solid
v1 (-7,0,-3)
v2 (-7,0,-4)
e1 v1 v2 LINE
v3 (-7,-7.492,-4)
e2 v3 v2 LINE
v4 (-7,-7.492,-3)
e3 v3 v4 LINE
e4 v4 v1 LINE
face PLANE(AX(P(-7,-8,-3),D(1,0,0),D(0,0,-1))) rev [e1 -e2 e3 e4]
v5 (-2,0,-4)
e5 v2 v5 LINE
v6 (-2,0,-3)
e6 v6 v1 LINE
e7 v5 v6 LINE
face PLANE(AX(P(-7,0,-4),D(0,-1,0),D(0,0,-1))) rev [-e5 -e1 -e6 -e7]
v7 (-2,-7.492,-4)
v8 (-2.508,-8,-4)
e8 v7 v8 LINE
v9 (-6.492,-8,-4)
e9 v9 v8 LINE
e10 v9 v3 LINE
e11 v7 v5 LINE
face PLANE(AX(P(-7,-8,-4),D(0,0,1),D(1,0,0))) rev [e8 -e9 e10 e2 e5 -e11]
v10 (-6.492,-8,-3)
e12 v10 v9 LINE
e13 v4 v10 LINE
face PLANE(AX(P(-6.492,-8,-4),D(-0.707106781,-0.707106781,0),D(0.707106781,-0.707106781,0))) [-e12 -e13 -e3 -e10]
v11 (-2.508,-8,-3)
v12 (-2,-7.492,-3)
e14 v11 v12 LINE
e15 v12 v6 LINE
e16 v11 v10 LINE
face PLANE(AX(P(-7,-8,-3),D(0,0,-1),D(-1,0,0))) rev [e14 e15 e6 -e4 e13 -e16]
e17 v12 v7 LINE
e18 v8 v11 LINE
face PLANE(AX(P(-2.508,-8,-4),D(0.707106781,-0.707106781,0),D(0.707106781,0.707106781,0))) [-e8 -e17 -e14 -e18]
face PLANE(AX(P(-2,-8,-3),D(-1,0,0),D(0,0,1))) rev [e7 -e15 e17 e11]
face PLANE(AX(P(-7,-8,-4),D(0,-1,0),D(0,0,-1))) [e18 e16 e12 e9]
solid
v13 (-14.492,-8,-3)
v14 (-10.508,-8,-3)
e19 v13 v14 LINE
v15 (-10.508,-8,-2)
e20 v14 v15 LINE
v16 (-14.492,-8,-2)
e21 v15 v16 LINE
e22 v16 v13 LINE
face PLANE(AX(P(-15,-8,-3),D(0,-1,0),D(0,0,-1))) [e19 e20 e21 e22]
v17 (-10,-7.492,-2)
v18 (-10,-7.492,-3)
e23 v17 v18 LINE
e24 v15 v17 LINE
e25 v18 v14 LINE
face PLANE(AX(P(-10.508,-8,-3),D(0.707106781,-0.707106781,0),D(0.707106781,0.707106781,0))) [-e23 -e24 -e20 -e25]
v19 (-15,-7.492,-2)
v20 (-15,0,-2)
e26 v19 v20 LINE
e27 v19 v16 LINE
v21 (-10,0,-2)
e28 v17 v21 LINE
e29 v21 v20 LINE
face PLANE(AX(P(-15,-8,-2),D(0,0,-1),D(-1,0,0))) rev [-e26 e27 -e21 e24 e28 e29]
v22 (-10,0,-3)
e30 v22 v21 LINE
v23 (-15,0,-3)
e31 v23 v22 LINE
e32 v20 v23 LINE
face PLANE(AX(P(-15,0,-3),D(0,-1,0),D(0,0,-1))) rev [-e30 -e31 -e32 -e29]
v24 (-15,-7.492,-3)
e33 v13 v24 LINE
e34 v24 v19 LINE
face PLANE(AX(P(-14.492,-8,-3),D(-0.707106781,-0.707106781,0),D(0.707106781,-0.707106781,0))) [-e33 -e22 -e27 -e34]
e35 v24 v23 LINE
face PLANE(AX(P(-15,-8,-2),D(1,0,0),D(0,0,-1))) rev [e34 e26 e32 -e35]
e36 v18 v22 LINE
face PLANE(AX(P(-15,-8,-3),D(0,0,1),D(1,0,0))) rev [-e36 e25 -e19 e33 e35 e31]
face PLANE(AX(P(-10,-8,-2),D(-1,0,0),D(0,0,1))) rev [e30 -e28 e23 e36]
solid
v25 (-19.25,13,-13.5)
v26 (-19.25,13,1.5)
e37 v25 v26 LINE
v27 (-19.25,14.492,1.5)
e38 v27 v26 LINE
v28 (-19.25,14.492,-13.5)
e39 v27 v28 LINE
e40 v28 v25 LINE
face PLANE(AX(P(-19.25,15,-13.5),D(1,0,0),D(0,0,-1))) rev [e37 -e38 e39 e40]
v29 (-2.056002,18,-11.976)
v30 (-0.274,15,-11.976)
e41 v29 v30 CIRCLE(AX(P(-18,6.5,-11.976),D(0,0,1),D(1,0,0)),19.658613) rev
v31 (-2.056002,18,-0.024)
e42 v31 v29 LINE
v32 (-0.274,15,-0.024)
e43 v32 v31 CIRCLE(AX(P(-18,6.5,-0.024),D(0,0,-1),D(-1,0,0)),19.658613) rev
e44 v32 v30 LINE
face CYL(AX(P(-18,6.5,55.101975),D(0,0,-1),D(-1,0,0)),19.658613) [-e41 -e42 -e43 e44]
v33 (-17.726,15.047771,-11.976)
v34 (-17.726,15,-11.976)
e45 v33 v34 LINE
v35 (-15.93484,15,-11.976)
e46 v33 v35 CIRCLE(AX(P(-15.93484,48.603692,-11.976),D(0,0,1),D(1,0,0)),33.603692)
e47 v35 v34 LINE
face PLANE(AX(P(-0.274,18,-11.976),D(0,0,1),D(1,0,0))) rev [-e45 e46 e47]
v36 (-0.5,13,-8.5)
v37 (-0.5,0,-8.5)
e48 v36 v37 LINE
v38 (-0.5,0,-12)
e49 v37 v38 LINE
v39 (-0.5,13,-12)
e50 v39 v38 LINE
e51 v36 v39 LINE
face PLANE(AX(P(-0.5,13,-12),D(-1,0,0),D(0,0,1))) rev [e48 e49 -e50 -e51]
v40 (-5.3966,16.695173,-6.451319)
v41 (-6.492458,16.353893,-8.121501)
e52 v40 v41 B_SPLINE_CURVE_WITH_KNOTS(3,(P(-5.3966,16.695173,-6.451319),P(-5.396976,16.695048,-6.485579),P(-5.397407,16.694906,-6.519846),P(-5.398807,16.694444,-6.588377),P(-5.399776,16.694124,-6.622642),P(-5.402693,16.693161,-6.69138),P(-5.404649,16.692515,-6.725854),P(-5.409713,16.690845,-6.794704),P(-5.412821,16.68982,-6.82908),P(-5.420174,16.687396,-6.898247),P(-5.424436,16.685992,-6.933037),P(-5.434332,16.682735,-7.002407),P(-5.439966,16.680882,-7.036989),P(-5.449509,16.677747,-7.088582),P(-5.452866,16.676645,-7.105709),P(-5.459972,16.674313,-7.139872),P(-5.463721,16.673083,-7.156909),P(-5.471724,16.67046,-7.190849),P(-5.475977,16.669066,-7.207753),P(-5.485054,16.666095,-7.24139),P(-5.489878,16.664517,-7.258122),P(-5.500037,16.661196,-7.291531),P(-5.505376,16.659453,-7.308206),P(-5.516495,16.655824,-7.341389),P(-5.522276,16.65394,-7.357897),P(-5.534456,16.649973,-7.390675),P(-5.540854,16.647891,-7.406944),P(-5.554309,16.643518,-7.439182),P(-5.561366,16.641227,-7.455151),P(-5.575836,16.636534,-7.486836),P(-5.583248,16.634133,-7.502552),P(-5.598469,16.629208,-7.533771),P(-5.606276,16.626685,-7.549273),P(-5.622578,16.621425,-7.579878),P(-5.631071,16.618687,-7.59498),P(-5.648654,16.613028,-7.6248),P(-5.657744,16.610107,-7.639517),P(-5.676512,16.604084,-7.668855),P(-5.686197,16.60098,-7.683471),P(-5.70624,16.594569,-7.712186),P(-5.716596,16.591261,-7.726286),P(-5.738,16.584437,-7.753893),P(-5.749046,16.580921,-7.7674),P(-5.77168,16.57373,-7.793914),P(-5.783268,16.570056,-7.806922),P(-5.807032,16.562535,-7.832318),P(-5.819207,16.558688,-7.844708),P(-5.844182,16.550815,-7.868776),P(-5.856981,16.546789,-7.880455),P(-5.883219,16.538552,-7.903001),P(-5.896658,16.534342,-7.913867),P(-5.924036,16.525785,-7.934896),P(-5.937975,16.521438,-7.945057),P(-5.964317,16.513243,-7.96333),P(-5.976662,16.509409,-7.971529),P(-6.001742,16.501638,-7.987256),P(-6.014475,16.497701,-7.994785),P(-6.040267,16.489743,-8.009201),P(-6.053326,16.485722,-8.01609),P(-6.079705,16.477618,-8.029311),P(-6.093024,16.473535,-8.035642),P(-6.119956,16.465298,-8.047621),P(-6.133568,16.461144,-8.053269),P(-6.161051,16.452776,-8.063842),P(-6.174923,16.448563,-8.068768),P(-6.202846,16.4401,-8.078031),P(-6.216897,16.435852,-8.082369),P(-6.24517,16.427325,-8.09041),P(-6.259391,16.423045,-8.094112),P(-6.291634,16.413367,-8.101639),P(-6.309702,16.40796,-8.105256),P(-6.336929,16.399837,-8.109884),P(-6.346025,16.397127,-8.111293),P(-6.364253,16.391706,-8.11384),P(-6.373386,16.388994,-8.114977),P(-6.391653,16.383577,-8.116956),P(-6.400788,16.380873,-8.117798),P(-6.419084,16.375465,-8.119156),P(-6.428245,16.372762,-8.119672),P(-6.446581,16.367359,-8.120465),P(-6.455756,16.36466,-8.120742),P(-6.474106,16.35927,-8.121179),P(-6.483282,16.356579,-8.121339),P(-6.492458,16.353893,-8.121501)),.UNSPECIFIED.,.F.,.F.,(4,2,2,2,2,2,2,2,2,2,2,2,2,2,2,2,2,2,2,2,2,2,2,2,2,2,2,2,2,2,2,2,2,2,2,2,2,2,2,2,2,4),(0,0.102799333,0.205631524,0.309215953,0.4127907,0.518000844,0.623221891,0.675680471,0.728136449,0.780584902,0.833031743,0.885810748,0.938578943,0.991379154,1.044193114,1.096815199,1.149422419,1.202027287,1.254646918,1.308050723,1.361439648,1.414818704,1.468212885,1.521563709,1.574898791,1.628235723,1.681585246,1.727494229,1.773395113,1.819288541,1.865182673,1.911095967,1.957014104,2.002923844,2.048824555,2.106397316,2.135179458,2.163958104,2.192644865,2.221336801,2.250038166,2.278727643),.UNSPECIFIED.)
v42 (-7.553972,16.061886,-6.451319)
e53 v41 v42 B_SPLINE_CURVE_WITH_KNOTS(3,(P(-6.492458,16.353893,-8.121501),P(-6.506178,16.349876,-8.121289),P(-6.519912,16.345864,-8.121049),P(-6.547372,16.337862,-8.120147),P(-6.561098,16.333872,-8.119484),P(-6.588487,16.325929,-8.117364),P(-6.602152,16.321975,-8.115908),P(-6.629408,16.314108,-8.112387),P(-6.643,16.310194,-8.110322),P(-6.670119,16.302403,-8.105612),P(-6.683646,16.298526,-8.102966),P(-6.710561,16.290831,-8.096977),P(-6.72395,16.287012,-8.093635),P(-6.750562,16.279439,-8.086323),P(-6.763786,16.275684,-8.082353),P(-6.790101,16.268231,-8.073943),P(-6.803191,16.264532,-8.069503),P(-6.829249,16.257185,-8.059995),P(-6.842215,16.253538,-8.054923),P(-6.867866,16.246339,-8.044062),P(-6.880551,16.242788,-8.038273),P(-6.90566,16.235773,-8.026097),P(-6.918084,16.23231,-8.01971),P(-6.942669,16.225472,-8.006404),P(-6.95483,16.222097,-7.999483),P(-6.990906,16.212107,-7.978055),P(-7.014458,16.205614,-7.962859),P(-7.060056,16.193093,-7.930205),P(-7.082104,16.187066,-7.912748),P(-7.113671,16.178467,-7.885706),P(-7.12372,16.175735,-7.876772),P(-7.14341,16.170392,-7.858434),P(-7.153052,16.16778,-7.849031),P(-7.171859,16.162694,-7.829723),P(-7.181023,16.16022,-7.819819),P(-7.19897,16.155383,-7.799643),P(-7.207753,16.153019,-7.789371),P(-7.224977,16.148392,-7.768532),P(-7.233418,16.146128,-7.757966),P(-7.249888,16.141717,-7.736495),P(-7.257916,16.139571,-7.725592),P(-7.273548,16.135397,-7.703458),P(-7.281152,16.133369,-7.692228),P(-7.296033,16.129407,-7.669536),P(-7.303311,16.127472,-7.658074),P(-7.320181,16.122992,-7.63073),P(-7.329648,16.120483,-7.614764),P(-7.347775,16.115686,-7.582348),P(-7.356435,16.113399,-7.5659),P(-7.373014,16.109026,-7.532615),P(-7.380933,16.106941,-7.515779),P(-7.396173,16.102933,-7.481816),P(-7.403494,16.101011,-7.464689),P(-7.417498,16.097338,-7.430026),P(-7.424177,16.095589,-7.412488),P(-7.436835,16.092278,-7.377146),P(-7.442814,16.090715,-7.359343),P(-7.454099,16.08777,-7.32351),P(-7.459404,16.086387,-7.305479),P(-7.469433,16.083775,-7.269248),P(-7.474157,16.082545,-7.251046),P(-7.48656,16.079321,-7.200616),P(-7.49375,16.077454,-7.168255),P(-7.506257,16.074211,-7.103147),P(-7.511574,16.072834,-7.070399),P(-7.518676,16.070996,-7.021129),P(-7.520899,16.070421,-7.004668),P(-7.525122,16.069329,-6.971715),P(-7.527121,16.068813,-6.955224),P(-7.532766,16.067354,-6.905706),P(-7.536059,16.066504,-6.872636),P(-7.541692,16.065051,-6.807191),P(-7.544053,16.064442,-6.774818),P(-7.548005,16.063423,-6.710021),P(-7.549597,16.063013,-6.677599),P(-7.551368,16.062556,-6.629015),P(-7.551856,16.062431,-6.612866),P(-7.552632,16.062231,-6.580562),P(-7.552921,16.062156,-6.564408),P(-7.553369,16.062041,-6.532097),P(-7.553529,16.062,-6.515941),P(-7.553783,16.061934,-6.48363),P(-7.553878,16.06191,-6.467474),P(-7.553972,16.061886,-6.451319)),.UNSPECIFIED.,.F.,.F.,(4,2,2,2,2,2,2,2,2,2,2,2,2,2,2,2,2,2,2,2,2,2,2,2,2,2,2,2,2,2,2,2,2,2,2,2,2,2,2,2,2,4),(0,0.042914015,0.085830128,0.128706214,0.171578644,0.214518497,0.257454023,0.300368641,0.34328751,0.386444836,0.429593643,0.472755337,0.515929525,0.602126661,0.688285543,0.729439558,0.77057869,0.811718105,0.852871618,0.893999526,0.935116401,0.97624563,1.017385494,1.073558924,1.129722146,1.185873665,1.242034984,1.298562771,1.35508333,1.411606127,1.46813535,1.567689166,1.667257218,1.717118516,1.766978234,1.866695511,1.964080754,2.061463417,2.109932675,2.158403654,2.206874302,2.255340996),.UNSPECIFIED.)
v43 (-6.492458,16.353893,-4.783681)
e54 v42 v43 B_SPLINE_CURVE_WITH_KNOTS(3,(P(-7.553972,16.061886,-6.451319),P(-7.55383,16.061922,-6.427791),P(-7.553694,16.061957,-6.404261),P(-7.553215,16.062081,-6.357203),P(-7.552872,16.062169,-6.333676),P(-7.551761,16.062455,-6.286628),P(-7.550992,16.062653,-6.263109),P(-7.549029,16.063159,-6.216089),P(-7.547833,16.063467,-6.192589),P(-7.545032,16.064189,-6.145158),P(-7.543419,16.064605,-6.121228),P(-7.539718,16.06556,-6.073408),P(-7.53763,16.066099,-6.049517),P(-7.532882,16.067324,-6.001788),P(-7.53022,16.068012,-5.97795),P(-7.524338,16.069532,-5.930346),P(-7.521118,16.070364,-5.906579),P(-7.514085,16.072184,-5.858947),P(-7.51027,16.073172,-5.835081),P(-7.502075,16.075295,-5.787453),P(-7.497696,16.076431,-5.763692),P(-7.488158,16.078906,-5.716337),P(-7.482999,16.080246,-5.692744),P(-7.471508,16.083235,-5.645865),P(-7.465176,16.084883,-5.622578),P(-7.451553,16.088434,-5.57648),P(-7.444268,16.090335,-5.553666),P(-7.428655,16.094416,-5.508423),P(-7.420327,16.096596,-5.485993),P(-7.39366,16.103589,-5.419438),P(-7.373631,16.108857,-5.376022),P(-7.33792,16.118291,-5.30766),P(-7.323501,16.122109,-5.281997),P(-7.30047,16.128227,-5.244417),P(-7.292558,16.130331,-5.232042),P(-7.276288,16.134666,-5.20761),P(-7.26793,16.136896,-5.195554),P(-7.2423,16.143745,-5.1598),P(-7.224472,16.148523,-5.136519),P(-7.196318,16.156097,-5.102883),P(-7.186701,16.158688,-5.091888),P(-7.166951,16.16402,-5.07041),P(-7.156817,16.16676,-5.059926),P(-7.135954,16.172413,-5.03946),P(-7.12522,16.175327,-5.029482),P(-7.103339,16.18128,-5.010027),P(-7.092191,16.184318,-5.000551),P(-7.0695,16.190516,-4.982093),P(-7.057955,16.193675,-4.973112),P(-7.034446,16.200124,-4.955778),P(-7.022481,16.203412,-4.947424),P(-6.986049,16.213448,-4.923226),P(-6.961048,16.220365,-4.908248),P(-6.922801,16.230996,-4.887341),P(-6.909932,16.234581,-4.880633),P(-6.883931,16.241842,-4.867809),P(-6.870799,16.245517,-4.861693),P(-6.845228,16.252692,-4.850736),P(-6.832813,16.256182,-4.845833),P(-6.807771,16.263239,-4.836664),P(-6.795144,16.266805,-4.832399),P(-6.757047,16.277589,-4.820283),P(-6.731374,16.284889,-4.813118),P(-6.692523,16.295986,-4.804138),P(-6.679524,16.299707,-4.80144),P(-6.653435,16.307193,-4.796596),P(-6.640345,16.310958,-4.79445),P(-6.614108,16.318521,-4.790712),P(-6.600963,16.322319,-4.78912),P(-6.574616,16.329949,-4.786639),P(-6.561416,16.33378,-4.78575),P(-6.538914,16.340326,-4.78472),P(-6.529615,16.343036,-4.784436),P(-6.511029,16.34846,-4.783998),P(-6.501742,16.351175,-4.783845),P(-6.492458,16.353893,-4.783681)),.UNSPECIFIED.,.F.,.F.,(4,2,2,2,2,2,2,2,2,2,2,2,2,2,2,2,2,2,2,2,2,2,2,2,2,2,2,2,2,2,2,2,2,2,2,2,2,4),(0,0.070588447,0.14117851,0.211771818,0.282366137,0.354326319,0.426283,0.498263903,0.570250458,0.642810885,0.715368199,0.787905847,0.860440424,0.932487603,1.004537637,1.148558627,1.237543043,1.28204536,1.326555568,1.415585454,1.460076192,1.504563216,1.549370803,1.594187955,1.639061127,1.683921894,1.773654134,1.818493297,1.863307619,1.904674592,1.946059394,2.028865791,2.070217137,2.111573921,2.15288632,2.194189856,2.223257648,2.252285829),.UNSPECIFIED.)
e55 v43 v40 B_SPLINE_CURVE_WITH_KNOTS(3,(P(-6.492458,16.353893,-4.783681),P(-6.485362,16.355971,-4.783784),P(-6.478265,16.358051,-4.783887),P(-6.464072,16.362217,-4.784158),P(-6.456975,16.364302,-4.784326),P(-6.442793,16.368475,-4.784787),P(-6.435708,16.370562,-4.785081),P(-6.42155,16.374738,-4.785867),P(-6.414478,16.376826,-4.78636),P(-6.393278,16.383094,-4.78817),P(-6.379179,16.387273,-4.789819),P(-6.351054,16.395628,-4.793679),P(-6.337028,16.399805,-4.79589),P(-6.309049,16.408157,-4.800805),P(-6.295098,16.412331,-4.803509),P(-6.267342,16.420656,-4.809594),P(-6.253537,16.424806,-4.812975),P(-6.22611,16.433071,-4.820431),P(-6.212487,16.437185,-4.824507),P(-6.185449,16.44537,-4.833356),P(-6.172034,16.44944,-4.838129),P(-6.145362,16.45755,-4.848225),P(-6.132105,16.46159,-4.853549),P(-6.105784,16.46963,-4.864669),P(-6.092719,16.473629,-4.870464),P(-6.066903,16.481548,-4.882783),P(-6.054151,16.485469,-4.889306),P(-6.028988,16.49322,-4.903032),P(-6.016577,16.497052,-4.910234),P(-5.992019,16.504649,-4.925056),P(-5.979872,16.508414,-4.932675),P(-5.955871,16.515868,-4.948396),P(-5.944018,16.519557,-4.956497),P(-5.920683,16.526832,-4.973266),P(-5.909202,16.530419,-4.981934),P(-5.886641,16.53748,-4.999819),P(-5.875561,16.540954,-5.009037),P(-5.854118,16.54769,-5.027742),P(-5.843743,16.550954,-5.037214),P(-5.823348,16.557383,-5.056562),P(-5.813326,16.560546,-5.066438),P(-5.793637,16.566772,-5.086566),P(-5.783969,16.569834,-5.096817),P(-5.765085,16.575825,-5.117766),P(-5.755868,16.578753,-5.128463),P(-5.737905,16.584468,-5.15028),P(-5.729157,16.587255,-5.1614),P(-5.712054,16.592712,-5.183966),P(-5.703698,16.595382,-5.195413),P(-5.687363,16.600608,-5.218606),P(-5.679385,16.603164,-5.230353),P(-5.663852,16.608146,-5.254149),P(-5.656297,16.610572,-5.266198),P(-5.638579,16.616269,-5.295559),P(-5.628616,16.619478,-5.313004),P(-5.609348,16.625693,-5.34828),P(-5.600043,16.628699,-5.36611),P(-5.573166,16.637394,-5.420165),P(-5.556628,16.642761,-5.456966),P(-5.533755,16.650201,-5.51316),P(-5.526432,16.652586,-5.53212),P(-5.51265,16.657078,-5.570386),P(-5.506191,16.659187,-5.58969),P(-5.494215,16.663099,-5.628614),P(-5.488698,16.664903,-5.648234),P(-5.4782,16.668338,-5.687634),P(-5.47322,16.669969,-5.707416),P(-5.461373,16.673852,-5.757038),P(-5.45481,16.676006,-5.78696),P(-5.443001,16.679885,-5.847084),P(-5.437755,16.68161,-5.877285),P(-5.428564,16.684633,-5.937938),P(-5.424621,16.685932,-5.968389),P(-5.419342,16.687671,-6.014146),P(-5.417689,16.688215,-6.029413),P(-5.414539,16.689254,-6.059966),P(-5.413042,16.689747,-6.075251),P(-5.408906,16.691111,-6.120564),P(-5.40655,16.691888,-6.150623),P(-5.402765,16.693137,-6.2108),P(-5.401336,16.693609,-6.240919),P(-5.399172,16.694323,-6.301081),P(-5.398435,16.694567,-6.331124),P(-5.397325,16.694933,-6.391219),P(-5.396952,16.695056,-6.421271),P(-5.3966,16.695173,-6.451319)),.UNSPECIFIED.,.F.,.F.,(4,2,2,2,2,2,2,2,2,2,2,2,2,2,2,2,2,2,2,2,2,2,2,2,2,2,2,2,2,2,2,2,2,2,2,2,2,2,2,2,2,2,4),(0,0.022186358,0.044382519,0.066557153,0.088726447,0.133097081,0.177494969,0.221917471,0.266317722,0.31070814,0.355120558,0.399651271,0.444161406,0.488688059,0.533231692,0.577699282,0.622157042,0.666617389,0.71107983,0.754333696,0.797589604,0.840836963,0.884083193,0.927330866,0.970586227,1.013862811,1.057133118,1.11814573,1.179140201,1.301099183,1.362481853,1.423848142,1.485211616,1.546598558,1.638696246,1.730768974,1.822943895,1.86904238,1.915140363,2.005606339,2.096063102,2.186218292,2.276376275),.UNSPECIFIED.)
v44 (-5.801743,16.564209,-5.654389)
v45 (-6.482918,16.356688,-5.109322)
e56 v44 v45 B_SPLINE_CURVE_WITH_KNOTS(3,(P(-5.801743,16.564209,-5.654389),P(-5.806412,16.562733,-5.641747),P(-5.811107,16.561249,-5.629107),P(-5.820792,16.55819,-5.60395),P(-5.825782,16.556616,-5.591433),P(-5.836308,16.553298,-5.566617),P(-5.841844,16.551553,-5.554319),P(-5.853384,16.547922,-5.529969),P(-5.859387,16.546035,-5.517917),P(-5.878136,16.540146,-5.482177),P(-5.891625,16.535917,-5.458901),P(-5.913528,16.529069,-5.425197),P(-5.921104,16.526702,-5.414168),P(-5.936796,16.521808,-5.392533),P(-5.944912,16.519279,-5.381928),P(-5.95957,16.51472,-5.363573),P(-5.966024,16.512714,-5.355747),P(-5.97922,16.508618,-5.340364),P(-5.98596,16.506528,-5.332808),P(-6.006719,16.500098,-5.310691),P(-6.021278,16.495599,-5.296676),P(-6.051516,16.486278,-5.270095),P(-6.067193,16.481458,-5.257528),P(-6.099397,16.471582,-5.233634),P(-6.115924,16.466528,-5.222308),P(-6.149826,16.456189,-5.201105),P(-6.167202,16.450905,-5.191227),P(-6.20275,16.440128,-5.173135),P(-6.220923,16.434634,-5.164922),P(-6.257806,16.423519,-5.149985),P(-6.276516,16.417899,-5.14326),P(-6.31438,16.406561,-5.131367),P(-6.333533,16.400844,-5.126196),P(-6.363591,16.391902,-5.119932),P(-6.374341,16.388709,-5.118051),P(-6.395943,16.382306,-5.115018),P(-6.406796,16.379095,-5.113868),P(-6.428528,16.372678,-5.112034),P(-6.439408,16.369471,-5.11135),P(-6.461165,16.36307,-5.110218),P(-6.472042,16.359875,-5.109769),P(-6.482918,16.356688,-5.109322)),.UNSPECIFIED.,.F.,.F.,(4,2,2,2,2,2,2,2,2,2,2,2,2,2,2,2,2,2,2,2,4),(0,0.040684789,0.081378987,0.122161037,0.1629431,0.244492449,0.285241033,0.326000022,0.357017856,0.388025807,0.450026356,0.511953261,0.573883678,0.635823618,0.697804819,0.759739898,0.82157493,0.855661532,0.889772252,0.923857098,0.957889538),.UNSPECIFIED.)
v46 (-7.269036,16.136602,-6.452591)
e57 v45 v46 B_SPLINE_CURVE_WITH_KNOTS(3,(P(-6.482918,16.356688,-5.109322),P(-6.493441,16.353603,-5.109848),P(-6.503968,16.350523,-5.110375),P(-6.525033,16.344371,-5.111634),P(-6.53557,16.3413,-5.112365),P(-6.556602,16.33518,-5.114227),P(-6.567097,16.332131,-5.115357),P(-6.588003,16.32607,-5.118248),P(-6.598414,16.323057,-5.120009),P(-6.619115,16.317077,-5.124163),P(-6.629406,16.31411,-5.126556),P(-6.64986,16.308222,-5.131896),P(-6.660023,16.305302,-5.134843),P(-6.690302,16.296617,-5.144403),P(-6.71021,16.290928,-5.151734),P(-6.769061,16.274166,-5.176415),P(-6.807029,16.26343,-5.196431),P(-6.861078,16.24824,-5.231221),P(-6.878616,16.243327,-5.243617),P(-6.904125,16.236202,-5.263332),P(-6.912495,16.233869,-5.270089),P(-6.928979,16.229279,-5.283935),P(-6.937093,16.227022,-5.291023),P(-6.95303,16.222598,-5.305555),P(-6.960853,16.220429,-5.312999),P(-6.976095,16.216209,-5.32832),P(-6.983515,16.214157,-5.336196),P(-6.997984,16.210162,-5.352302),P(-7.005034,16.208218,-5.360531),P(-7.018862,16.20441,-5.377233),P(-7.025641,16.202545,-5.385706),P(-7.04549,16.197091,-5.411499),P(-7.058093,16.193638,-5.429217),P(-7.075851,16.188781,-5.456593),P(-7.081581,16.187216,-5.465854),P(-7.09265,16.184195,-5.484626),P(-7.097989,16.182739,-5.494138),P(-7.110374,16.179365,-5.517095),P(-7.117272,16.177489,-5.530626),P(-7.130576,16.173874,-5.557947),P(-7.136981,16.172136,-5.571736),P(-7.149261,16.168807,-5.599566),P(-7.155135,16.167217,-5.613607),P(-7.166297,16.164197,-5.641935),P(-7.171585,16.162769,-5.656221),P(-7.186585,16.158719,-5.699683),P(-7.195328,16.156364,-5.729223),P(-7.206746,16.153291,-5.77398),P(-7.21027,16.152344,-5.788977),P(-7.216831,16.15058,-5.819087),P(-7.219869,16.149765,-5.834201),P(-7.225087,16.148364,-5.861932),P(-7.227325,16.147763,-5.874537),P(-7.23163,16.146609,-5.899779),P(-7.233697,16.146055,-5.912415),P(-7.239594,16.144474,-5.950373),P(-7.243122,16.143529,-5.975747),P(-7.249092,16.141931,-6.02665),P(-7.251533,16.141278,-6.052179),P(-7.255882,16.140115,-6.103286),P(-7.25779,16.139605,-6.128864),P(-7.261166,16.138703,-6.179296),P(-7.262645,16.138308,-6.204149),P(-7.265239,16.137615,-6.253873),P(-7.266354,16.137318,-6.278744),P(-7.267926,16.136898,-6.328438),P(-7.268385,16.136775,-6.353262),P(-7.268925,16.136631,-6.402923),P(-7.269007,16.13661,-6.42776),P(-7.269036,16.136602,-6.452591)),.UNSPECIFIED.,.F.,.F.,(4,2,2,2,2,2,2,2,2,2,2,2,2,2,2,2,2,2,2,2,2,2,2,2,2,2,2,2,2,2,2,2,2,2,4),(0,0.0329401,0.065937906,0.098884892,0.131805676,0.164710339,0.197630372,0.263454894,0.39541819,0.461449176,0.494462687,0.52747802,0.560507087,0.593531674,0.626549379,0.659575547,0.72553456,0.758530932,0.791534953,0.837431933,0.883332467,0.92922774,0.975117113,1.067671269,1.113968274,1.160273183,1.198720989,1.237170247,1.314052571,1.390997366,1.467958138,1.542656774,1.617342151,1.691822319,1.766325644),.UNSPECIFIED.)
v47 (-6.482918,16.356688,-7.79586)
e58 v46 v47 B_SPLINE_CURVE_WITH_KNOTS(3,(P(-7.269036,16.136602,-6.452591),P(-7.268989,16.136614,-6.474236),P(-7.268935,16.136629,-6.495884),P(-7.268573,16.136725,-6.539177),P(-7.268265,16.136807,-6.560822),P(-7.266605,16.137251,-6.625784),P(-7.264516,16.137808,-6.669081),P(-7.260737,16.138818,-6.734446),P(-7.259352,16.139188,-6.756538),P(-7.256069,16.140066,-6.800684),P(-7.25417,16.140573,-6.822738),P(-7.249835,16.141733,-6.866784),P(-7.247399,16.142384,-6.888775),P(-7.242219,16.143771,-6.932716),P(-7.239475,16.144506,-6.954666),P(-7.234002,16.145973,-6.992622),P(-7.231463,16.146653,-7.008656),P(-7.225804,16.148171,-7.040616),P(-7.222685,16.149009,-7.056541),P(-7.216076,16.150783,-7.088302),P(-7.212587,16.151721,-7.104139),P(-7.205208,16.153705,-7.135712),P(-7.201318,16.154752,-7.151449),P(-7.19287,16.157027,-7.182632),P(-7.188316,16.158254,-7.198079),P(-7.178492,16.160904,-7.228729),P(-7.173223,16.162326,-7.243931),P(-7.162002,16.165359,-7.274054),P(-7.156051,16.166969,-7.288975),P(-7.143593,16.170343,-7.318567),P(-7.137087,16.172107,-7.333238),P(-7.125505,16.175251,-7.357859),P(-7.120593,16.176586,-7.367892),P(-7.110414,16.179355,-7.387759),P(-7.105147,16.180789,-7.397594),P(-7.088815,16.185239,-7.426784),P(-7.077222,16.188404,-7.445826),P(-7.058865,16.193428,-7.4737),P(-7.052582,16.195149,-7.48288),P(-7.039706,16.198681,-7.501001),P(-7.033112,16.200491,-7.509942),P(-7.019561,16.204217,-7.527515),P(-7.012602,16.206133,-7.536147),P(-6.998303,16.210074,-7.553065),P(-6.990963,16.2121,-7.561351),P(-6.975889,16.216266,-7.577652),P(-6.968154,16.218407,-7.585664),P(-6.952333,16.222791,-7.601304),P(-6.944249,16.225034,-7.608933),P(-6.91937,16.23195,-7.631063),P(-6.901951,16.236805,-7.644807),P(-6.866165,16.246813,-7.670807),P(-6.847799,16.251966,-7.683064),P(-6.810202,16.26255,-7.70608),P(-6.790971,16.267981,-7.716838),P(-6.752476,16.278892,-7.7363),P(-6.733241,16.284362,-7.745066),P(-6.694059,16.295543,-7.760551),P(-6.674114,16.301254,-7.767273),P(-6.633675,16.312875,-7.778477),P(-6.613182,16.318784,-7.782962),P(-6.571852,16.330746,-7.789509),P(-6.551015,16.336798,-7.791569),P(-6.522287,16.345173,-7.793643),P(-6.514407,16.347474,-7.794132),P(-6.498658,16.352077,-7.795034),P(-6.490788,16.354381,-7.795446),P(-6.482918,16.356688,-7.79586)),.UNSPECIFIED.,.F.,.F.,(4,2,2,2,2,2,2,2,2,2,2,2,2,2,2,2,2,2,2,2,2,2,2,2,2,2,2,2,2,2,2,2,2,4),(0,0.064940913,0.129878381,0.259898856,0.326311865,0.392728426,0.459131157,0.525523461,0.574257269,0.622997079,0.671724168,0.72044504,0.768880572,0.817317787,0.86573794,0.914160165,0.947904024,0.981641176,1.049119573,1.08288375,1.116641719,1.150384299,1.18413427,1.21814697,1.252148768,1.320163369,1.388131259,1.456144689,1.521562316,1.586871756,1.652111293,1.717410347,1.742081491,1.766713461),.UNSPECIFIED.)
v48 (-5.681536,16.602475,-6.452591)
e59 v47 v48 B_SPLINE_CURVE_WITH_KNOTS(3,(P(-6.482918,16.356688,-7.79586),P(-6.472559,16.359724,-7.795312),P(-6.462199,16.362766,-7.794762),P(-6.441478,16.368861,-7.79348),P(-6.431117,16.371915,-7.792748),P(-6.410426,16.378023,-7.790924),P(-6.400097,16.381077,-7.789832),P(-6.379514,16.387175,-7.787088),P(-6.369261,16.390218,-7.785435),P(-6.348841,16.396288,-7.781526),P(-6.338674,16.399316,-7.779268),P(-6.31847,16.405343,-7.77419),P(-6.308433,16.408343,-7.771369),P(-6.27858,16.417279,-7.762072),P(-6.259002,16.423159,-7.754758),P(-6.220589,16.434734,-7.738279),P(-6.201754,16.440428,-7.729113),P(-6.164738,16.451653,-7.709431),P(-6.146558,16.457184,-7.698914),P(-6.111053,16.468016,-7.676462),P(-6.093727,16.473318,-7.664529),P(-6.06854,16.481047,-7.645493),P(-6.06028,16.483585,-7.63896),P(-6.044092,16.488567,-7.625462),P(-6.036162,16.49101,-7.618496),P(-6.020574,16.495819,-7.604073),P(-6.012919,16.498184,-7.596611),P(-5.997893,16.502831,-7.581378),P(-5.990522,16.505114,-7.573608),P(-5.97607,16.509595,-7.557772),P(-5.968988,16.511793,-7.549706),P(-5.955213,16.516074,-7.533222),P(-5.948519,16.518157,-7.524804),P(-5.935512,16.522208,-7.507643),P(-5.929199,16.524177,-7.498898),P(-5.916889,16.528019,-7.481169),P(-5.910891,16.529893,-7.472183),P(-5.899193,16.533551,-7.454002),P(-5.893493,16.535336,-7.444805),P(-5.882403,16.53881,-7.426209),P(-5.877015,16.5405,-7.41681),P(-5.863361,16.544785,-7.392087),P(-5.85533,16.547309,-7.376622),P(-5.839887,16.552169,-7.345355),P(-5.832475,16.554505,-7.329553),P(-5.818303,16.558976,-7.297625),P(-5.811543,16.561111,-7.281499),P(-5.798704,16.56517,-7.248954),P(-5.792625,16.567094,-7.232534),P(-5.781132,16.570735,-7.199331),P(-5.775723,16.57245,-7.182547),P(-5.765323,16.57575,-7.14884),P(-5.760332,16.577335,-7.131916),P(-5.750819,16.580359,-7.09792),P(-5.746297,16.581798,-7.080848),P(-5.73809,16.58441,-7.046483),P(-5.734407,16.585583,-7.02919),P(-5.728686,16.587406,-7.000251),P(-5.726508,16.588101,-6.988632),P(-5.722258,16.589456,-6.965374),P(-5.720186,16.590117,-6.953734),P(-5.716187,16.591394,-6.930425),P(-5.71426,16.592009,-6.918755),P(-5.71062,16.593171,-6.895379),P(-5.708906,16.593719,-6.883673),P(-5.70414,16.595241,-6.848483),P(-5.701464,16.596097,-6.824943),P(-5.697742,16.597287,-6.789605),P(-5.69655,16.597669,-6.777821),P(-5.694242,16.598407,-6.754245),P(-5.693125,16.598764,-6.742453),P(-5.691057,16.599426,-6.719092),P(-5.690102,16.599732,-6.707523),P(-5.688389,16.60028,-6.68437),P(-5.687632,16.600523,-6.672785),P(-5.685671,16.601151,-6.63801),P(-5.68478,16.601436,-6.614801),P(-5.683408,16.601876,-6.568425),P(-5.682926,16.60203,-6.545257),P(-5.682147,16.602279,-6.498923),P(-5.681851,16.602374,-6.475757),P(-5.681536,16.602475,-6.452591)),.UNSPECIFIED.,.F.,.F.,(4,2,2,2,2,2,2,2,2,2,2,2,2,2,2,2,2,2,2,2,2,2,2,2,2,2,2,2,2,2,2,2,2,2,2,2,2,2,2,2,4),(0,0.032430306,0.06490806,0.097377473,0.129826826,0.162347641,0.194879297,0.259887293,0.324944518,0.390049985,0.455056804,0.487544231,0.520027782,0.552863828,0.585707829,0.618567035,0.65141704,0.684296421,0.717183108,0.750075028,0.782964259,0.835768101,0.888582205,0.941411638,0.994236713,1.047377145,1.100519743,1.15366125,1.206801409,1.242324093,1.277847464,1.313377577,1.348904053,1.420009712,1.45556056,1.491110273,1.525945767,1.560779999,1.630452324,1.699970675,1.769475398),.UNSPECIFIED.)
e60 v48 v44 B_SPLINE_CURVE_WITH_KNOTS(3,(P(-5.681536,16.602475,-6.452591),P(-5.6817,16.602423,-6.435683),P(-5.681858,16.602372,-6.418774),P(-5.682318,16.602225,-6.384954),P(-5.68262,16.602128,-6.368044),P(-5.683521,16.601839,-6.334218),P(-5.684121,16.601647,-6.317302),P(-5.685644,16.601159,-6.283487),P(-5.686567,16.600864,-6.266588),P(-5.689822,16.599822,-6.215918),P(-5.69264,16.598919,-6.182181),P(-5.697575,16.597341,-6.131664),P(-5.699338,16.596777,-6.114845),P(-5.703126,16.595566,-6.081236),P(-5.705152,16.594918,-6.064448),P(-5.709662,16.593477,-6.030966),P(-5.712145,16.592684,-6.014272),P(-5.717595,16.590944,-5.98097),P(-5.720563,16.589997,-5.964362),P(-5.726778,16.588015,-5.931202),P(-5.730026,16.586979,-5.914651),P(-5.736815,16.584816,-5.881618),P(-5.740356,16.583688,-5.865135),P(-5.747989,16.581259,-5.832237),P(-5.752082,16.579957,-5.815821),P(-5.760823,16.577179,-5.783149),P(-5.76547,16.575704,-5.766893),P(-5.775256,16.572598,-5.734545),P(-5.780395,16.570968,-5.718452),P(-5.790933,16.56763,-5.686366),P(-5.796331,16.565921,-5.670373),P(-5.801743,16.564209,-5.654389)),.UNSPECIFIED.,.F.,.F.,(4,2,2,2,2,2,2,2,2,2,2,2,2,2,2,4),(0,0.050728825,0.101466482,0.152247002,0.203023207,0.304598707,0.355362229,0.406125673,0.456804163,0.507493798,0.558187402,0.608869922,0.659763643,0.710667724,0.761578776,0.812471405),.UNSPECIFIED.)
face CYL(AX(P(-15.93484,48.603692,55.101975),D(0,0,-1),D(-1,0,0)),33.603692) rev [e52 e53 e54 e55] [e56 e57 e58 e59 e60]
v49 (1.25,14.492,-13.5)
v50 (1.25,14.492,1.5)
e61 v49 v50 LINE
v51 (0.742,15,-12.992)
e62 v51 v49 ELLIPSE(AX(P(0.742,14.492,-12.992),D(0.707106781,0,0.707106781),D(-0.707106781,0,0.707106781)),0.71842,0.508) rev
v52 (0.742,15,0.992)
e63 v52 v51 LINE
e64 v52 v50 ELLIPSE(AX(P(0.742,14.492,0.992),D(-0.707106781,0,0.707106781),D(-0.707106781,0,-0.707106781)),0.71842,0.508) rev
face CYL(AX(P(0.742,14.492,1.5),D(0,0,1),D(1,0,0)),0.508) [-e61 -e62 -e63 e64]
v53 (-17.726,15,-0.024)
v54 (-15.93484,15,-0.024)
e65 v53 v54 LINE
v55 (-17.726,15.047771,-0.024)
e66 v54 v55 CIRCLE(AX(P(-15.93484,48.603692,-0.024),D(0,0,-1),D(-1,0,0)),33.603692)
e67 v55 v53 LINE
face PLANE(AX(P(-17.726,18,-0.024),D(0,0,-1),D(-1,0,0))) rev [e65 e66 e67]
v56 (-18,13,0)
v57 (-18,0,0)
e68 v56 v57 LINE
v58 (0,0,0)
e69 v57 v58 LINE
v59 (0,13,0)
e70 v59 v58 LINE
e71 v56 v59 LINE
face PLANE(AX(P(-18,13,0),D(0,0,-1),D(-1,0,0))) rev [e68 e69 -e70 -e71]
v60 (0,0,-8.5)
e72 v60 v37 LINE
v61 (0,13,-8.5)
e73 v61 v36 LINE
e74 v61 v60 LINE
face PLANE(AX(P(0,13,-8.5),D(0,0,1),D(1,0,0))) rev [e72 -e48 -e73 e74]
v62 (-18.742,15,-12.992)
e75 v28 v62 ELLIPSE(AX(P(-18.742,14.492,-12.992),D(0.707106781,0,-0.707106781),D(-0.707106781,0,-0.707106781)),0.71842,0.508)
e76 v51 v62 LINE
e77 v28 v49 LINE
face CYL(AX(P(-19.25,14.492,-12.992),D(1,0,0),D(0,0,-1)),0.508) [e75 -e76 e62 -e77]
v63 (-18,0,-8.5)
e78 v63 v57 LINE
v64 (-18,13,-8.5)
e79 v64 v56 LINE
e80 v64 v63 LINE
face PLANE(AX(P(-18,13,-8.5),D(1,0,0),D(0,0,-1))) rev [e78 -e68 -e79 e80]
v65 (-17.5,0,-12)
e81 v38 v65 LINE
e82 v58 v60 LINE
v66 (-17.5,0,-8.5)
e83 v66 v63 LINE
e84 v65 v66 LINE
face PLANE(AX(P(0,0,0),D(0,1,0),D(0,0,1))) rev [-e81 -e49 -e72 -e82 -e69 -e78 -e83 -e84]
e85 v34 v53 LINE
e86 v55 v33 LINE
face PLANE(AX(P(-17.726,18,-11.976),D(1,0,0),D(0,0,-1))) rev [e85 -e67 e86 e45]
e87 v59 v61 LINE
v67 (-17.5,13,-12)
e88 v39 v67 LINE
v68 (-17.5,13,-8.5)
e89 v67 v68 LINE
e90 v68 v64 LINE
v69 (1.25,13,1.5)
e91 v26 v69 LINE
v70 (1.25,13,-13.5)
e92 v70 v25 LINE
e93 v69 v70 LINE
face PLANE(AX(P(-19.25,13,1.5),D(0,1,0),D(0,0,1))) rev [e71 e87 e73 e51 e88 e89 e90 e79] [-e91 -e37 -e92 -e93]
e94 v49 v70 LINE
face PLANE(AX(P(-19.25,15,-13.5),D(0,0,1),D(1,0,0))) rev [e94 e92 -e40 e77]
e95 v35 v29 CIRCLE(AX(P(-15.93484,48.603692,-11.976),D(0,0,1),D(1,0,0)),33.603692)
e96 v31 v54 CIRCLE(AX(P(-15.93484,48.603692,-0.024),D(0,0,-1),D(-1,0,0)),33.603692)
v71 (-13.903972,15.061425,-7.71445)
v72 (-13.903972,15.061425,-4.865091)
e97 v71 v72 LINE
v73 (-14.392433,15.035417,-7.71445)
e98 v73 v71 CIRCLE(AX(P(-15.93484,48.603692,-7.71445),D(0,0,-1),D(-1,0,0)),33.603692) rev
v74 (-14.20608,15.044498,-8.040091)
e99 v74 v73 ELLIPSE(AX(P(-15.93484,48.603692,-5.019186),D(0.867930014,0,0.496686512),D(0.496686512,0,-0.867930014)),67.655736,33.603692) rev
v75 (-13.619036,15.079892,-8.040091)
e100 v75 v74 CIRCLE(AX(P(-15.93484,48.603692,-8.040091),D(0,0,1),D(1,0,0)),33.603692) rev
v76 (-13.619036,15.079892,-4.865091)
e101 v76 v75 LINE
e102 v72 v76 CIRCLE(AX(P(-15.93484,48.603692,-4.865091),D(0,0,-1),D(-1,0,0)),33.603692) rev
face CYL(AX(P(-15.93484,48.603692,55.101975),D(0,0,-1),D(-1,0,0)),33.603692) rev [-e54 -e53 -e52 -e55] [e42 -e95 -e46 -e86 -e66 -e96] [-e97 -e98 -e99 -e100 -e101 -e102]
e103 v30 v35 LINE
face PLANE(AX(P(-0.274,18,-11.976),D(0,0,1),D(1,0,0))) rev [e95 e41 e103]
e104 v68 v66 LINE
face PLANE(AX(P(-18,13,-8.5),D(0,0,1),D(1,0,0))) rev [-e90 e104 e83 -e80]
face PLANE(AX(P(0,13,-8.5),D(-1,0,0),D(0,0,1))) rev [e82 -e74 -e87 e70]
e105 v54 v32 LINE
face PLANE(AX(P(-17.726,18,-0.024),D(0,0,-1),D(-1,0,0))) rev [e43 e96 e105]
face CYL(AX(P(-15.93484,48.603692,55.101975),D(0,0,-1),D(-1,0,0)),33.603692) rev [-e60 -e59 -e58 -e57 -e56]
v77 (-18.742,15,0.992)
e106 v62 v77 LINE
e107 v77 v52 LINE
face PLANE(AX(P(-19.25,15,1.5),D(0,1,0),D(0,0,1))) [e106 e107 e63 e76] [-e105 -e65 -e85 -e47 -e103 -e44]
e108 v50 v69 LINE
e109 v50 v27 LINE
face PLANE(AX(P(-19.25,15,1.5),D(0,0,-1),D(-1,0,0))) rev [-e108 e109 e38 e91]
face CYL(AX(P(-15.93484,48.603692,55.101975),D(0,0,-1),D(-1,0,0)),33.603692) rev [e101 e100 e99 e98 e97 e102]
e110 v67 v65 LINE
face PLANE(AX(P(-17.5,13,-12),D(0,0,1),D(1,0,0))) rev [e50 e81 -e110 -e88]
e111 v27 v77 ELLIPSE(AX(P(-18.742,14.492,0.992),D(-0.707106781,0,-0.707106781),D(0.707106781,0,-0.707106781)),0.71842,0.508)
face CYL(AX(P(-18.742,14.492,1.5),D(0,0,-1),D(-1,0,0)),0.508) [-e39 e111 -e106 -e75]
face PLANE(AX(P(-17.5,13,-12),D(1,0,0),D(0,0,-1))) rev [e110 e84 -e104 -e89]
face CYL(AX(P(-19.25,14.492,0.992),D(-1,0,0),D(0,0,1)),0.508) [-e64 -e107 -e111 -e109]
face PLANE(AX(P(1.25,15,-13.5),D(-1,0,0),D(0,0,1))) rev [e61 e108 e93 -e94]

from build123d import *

# Parameters (mm, degrees)
BOSS_EXTRUDE1_DEPTH   = 13
SKETCH2_W             = 20.5
SKETCH2_H             = 15
BOSS_EXTRUDE2_DEPTH   = 2
FILLET1_R             = 0.508
SKETCH3_W             = 17.452
SKETCH3_H             = 11.952
BOSS_EXTRUDE3_DEPTH   = 3
CUT_EXTRUDE2_START    = -11.952
CUT_EXTRUDE2_DEPTH    = 11.952
SKETCH6_W             = 5
SKETCH6_H             = 1
BOSS_EXTRUDE4_DEPTH   = 8
BOSS_EXTRUDE4_2_DEPTH = 8
CHAMFER1_SIZE         = 0.508
CHAMFER2_SIZE         = 0.508


# Read off the part's stored shape, not the designer's step: Cut-Extrude2
with BuildPart() as part:
    # Sketch1 → Boss-Extrude1 (new body)
    with BuildSketch(Plane(origin=(0, 0, 0), x_dir=(1, 0, 0), z_dir=(0, 1, 0))):
        Polygon((-17.5, 12), (-17.5, 8.5), (-18, 8.5), (-18, 0), (0, 0), (0, 8.5), (-0.5, 8.5), (-0.5, 12), align=None)
    extrude(amount=BOSS_EXTRUDE1_DEPTH)

    # Sketch2 → Boss-Extrude2 (add)
    with BuildSketch(Plane(origin=(0, 13, 0), x_dir=(1, 0, 0), z_dir=(0, 1, 0))):
        with Locations((-9, 6)):
            Rectangle(SKETCH2_W, SKETCH2_H)
    extrude(amount=BOSS_EXTRUDE2_DEPTH)

    # Fillet1
    fillet1_edges = [part.edges().sort_by_distance(p)[0] for p in [
        (-19.25, 15, -6),
        (-9, 15, 1.5),
        (1.25, 15, -6),
        (-9, 15, -13.5),
    ]]
    fillet(fillet1_edges, radius=FILLET1_R)

    # Sketch3 → Boss-Extrude3 (add)
    with BuildSketch(Plane(origin=(0, 15, 0), x_dir=(1, 0, 0), z_dir=(0, 1, 0))):
        with Locations((-9, 6)):
            Rectangle(SKETCH3_W, SKETCH3_H)
    extrude(amount=BOSS_EXTRUDE3_DEPTH)

    # Cut-Extrude2 outline → Cut-Extrude2 (cut)
    with BuildSketch(Plane.XY.offset(-0.024).offset(CUT_EXTRUDE2_START)):
        with BuildLine():
            Line((-0.274, 18), (-2.056001882, 18))
            ThreePointArc((-2.056001882, 18), (-1.098307975, 16.539615664), (-0.274, 15))
            Line((-0.274, 15), (-0.274, 18))
        make_face()
        with BuildLine():
            ThreePointArc((-17.726, 15.047770582), (-9.713352624, 15.580954239), (-2.056001882, 18))
            Line((-2.056001882, 18), (-17.726, 18))
            Line((-17.726, 18), (-17.726, 15.047770582))
        make_face()
    extrude(amount=CUT_EXTRUDE2_DEPTH, mode=Mode.SUBTRACT)


with BuildPart() as body_2:
    # Sketch6 → Boss-Extrude4 (new body)
    with BuildSketch(Plane.XZ):
        with Locations((-4.5, -3.5)):
            Rectangle(SKETCH6_W, SKETCH6_H)
    extrude(amount=BOSS_EXTRUDE4_DEPTH)

    # Chamfer2
    chamfer2_edges = [body_2.edges().sort_by_distance(p)[0] for p in [
        (-2, -8, -3.5),
        (-7, -8, -3.5),
    ]]
    chamfer(chamfer2_edges, length=CHAMFER2_SIZE)


with BuildPart() as body_3:
    # Sketch6 → Boss-Extrude4 2 (new body)
    with BuildSketch(Plane.XZ):
        with Locations((-12.5, -2.5)):
            Rectangle(SKETCH6_W, SKETCH6_H)
    extrude(amount=BOSS_EXTRUDE4_2_DEPTH)

    # Chamfer1
    chamfer1_edges = [body_3.edges().sort_by_distance(p)[0] for p in [
        (-10, -8, -2.5),
        (-15, -8, -2.5),
    ]]
    chamfer(chamfer1_edges, length=CHAMFER1_SIZE)


solid = Compound([part.part, body_2.part, body_3.part])
